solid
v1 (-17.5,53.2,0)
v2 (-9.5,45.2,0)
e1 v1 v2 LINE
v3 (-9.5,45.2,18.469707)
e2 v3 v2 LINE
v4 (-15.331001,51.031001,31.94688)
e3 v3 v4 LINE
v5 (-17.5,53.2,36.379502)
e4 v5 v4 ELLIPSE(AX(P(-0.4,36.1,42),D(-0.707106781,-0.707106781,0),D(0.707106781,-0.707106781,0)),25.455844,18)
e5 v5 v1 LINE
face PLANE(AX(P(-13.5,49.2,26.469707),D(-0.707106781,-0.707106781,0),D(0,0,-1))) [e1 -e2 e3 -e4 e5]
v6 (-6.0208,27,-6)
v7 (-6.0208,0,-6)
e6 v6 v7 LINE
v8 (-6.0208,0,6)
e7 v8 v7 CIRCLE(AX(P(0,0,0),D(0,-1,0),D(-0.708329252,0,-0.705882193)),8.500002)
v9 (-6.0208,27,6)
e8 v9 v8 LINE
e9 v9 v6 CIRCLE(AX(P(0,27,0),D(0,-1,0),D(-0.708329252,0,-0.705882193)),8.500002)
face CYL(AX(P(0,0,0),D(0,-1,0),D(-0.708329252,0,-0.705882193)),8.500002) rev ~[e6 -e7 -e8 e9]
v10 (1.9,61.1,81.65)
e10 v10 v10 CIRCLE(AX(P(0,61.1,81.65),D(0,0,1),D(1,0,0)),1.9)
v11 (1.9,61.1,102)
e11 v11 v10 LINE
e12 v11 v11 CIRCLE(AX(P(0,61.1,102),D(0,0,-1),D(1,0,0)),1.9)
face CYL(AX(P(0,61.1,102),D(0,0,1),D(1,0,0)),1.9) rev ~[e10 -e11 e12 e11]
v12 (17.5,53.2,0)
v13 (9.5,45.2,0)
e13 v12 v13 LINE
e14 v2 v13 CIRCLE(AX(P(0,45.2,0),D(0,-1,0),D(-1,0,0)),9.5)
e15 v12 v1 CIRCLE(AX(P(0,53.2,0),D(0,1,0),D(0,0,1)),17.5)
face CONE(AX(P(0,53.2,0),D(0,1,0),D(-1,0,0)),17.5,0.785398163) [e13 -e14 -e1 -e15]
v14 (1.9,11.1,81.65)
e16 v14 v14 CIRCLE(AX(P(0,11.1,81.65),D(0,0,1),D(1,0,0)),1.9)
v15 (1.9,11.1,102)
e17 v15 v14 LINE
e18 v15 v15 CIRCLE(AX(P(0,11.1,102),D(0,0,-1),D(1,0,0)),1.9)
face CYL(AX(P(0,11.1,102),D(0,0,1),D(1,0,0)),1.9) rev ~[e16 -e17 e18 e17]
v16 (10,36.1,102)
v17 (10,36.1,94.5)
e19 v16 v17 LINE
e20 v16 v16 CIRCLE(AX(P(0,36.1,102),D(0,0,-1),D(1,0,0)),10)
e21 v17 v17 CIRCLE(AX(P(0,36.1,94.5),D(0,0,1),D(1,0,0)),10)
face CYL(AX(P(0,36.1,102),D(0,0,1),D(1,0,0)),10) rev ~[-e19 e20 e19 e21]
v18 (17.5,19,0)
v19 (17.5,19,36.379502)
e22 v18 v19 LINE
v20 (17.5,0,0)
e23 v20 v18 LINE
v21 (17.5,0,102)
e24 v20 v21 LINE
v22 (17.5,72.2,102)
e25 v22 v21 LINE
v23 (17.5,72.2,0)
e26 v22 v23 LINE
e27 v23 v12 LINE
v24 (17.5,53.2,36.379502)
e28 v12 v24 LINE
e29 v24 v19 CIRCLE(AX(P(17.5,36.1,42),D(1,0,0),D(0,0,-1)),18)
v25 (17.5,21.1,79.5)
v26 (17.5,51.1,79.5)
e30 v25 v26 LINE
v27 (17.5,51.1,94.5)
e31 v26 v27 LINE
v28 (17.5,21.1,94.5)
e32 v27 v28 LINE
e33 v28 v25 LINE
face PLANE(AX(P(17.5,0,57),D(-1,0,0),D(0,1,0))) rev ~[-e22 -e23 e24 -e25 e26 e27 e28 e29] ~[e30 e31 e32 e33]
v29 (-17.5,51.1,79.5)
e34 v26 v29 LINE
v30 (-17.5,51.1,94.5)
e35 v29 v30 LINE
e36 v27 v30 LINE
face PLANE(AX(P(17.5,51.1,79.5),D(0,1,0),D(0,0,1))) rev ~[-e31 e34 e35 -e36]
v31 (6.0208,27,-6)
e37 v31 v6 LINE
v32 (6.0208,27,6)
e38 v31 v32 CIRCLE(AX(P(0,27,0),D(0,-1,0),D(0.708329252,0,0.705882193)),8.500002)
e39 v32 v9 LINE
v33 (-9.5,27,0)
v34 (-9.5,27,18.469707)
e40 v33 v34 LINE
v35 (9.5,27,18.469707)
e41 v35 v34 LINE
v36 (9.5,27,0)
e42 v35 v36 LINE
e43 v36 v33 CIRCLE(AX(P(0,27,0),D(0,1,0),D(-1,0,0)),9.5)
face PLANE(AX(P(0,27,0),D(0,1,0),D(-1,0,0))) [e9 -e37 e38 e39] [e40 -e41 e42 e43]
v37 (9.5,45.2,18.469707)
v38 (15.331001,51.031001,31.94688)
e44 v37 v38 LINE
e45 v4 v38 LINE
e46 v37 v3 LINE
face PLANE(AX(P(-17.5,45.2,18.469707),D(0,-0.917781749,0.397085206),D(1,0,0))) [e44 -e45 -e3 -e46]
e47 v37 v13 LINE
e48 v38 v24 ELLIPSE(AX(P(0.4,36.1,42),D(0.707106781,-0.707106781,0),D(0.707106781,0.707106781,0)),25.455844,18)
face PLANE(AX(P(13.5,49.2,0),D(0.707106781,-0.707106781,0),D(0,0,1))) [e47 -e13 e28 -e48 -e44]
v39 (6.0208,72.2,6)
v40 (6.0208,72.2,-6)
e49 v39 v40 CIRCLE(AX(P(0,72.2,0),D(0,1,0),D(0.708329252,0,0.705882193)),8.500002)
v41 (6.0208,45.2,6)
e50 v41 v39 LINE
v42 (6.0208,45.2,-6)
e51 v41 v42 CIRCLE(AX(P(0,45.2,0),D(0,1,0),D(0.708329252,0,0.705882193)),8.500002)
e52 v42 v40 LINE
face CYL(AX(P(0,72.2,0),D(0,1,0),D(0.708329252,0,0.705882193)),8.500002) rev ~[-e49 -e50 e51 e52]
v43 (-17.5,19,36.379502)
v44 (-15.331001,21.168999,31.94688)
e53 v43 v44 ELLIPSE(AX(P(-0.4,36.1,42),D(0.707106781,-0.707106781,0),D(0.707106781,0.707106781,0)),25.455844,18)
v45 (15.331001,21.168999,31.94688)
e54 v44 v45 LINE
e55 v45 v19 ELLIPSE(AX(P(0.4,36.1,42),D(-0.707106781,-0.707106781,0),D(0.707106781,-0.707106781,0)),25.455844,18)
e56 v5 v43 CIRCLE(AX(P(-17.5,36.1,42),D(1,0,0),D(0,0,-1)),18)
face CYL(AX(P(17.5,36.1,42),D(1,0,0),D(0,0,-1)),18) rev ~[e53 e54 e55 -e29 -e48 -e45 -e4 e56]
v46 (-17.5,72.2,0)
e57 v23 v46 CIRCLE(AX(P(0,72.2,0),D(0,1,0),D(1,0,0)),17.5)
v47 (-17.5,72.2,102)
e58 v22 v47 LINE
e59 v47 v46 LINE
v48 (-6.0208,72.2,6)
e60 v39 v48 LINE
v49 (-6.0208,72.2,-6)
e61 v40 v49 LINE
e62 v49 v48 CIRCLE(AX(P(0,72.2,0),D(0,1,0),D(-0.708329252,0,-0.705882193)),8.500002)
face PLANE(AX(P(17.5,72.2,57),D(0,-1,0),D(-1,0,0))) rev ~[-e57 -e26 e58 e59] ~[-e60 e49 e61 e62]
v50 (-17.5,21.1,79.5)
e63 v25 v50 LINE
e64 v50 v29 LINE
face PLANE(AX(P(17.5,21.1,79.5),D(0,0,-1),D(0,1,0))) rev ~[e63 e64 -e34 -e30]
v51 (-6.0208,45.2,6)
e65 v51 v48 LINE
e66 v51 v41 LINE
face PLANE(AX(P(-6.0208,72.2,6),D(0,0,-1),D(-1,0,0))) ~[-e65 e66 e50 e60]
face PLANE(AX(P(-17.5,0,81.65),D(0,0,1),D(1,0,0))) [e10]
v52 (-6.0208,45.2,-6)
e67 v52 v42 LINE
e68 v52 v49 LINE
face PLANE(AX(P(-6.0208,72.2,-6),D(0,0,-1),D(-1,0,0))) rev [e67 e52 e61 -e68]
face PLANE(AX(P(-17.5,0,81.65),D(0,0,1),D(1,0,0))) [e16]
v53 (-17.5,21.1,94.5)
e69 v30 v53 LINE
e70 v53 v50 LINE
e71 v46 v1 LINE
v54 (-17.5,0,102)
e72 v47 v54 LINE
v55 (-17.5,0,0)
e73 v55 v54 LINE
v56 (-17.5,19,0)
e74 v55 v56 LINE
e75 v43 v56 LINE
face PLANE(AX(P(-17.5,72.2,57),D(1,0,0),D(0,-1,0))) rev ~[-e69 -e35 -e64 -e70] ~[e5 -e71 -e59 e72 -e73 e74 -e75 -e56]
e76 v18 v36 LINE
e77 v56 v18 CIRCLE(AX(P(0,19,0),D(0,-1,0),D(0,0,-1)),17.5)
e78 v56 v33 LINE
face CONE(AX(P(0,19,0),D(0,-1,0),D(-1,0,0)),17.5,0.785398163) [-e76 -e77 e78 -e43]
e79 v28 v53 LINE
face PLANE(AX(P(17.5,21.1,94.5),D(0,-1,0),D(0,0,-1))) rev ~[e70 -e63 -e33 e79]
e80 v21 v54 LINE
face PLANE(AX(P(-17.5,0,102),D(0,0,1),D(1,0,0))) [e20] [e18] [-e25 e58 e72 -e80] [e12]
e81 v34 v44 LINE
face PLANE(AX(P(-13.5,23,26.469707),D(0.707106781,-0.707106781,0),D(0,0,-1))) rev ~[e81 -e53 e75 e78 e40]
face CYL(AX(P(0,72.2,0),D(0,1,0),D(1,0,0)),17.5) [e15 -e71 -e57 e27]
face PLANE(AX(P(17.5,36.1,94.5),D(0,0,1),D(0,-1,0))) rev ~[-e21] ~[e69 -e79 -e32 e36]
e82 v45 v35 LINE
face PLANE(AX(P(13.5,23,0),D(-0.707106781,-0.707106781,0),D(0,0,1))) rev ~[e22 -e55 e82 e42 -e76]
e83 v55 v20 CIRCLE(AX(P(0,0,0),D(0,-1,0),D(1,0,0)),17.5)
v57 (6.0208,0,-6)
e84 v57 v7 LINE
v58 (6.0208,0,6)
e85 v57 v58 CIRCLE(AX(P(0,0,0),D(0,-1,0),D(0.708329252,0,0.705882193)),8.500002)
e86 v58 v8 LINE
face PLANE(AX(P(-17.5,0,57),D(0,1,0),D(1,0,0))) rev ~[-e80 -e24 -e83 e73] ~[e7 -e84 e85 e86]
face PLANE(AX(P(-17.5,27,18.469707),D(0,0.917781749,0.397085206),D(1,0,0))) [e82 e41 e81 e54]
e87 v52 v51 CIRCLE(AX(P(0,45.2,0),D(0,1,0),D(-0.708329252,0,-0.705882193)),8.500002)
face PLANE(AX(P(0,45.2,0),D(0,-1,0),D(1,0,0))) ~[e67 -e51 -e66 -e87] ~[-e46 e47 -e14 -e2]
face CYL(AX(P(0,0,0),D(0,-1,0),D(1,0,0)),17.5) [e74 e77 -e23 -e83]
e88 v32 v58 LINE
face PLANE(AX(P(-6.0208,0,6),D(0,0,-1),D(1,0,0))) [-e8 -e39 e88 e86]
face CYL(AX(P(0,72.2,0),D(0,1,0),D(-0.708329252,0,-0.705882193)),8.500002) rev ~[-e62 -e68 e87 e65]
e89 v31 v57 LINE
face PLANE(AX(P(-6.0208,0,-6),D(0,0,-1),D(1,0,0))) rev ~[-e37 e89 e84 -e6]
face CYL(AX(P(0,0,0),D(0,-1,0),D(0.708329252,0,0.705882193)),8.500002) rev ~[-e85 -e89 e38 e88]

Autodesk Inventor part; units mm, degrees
ref_plane "YZ Plane" through (0, 0, 0) normal (1, 0, 0) x (0, 1, 0)
ref_plane "XZ Plane" through (0, 0, 0) normal (0, 1, 0) x (-1, 0, 0)
sketch "Эскиз1" plane through (0, 0, 0) normal (0, 1, 0) x (-1, 0, 0)
  arc A0 (6.0208, -6) -> (6.0208, 6) centre (0, 0) ccw
  line L0 (6.0208, -6) -> (-6.0208, -6)
  arc A1 (-6.0208, 6) -> (-6.0208, -6) centre (0, 0) ccw
  line L1 (6.0208, 6) -> (-6.0208, 6)
  line L2 (17.5, 37) -> (-17.5, 37)
  line L3 (-17.5, 37) -> (-17.5, 0)
  arc A2 (-17.5, 0) -> (17.5, 0) centre (0, 0) ccw
  line L4 (17.5, 0) -> (17.5, 37)
  line L5 (17.5, 0) -> (17.5, 57)
  line L6 (-17.5, 37) -> (17.5, 37)
  line L7 (17.5, 37) -> (17.5, 57)
  line L8 (17.5, 57) -> (-17.5, 57)
  line L9 (-17.5, 57) -> (-17.5, 37)
extrude "Выдавливание1" add sketch "Эскиз1" along normal blind 27
sketch "Эскиз2" plane through (-17.5, 0, 57) normal (0, 0, 1) x (1, 0, 0)
  line L0 (0, 0) -> (35, 0)
  line L1 (35, 0) -> (35, 72.2)
  line L2 (35, 72.2) -> (0, 72.2)
  line L3 (0, 72.2) -> (0, 0)
  point P0 (17.5, 0)
  dimension "d2" = 72.2
extrude "Выдавливание2" add sketch "Эскиз2" along normal blind 27
ref_plane "РабПлоскость1" through (17.5, 36.1, 84) normal (0, 1, 0) x (1, 0, 0)
mirror "Зеркальное отражение1" about plane through (17.5, 36.1, 84) normal (0, 1, 0) of "Выдавливание1"
sketch "Эскиз3" plane through (17.5, 0, 0) normal (1, 0, 0) x (0, 0, -1)
  line L0 (-57, 45.2) -> (-57, 27) projected
  line L1 (-57, 36.1) -> (-42, 36.1)
  circle A0 centre (-42, 36.1) radius 18
  point P0 (0, 0)
  dimension "d5" = 15
  dimension "d6" = 36
extrude "Выдавливание3" cut sketch "Эскиз3" against normal blind 93.5
chamfer "Фаска2" distance 8 angle 45 8 edges at (0, 27, 26.4697) (0, 45.2, 26.4697) (-17.5, 27, 13.2349) (0, 27, -17.5) (17.5, 27, 13.2349) (-17.5, 45.2, 13.2349) (0, 45.2, -17.5) (17.5, 45.2, 13.2349)
move faces "Перенос1" translate (0, 0, 18) faces at (-5.8333, 48.1333, 84)
sketch "Эскиз4" plane through (17.5, 36.1, 42) normal (1, 0, 0) x (0, 0, -1)
  line L0 (-60, -36.1) -> (-60, 36.1) projected
  line L1 (-60, 0) -> (-45, 0)
  line L2 (-52.5, -15) -> (-37.5, -15)
  line L3 (-37.5, -15) -> (-37.5, 15)
  line L4 (-37.5, 15) -> (-52.5, 15)
  line L5 (-52.5, 15) -> (-52.5, -15)
  line L6 (-52.5, -15) -> (-37.5, 15) construction
  line L7 (-37.5, -15) -> (-52.5, 15) construction
  point P0 (42, -36.1)
  dimension "d18" = 15
  dimension "d19" = 15
  dimension "d20" = 30
extrude "Выдавливание4" cut sketch "Эскиз4" against normal blind 79.25
sketch "Эскиз5" plane through (-17.5, 0, 102) normal (0, 0, 1) x (1, 0, 0)
  line L0 (23.5208, 72.2) -> (11.4792, 72.2) projected
  line L1 (17.5, 72.2) -> (17.5, 36.1)
  circle A0 centre (17.5, 36.1) radius 10
  point P0 (17.5, 0)
  dimension "d23" = 36.1
  dimension "d24" = 20
extrude "Выдавливание5" cut sketch "Эскиз5" against normal blind 12.5
sketch "Эскиз14" plane through (-17.5, 0, 102) normal (0, 0, 1) x (1, 0, 0)
  circle A0 centre (17.5, 36.1) radius 10 projected
  line L0 (17.5, 36.1) -> (17.5, 61.1)
  circle A1 centre (17.5, 61.1) radius 1.9
  line L1 (17.5, 36.1) -> (17.5, 11.1)
  circle A2 centre (17.5, 11.1) radius 1.9
  point P0 (17.5, 0)
  dimension "d47" = 25
  dimension "d48" = 3.8
  dimension "d49" = 25
  dimension "d50" = 3.8
extrude "Выдавливание13" cut sketch "Эскиз14" against normal blind 20.35 contours A1 | A2
sketch "Эскиз15" plane through (-17.5, 0, 102) normal (0, 0, 1) x (1, 0, 0)
  circle A0 centre (17.5, 61.1) radius 1.9 projected
  circle A1 centre (17.5, 11.1) radius 1.9 projected
  circle A2 centre (17.5, 36.1) radius 10 projected
  line L0 (0, 0) -> (35, 0) projected
  line L1 (35, 0) -> (35, 72.2) projected
  line L2 (35, 72.2) -> (0, 72.2) projected
  line L3 (0, 72.2) -> (0, 0) projected
  point P0 (17.5, 0)
properties part number "joint_2_part1" material "Пластик АБС"
